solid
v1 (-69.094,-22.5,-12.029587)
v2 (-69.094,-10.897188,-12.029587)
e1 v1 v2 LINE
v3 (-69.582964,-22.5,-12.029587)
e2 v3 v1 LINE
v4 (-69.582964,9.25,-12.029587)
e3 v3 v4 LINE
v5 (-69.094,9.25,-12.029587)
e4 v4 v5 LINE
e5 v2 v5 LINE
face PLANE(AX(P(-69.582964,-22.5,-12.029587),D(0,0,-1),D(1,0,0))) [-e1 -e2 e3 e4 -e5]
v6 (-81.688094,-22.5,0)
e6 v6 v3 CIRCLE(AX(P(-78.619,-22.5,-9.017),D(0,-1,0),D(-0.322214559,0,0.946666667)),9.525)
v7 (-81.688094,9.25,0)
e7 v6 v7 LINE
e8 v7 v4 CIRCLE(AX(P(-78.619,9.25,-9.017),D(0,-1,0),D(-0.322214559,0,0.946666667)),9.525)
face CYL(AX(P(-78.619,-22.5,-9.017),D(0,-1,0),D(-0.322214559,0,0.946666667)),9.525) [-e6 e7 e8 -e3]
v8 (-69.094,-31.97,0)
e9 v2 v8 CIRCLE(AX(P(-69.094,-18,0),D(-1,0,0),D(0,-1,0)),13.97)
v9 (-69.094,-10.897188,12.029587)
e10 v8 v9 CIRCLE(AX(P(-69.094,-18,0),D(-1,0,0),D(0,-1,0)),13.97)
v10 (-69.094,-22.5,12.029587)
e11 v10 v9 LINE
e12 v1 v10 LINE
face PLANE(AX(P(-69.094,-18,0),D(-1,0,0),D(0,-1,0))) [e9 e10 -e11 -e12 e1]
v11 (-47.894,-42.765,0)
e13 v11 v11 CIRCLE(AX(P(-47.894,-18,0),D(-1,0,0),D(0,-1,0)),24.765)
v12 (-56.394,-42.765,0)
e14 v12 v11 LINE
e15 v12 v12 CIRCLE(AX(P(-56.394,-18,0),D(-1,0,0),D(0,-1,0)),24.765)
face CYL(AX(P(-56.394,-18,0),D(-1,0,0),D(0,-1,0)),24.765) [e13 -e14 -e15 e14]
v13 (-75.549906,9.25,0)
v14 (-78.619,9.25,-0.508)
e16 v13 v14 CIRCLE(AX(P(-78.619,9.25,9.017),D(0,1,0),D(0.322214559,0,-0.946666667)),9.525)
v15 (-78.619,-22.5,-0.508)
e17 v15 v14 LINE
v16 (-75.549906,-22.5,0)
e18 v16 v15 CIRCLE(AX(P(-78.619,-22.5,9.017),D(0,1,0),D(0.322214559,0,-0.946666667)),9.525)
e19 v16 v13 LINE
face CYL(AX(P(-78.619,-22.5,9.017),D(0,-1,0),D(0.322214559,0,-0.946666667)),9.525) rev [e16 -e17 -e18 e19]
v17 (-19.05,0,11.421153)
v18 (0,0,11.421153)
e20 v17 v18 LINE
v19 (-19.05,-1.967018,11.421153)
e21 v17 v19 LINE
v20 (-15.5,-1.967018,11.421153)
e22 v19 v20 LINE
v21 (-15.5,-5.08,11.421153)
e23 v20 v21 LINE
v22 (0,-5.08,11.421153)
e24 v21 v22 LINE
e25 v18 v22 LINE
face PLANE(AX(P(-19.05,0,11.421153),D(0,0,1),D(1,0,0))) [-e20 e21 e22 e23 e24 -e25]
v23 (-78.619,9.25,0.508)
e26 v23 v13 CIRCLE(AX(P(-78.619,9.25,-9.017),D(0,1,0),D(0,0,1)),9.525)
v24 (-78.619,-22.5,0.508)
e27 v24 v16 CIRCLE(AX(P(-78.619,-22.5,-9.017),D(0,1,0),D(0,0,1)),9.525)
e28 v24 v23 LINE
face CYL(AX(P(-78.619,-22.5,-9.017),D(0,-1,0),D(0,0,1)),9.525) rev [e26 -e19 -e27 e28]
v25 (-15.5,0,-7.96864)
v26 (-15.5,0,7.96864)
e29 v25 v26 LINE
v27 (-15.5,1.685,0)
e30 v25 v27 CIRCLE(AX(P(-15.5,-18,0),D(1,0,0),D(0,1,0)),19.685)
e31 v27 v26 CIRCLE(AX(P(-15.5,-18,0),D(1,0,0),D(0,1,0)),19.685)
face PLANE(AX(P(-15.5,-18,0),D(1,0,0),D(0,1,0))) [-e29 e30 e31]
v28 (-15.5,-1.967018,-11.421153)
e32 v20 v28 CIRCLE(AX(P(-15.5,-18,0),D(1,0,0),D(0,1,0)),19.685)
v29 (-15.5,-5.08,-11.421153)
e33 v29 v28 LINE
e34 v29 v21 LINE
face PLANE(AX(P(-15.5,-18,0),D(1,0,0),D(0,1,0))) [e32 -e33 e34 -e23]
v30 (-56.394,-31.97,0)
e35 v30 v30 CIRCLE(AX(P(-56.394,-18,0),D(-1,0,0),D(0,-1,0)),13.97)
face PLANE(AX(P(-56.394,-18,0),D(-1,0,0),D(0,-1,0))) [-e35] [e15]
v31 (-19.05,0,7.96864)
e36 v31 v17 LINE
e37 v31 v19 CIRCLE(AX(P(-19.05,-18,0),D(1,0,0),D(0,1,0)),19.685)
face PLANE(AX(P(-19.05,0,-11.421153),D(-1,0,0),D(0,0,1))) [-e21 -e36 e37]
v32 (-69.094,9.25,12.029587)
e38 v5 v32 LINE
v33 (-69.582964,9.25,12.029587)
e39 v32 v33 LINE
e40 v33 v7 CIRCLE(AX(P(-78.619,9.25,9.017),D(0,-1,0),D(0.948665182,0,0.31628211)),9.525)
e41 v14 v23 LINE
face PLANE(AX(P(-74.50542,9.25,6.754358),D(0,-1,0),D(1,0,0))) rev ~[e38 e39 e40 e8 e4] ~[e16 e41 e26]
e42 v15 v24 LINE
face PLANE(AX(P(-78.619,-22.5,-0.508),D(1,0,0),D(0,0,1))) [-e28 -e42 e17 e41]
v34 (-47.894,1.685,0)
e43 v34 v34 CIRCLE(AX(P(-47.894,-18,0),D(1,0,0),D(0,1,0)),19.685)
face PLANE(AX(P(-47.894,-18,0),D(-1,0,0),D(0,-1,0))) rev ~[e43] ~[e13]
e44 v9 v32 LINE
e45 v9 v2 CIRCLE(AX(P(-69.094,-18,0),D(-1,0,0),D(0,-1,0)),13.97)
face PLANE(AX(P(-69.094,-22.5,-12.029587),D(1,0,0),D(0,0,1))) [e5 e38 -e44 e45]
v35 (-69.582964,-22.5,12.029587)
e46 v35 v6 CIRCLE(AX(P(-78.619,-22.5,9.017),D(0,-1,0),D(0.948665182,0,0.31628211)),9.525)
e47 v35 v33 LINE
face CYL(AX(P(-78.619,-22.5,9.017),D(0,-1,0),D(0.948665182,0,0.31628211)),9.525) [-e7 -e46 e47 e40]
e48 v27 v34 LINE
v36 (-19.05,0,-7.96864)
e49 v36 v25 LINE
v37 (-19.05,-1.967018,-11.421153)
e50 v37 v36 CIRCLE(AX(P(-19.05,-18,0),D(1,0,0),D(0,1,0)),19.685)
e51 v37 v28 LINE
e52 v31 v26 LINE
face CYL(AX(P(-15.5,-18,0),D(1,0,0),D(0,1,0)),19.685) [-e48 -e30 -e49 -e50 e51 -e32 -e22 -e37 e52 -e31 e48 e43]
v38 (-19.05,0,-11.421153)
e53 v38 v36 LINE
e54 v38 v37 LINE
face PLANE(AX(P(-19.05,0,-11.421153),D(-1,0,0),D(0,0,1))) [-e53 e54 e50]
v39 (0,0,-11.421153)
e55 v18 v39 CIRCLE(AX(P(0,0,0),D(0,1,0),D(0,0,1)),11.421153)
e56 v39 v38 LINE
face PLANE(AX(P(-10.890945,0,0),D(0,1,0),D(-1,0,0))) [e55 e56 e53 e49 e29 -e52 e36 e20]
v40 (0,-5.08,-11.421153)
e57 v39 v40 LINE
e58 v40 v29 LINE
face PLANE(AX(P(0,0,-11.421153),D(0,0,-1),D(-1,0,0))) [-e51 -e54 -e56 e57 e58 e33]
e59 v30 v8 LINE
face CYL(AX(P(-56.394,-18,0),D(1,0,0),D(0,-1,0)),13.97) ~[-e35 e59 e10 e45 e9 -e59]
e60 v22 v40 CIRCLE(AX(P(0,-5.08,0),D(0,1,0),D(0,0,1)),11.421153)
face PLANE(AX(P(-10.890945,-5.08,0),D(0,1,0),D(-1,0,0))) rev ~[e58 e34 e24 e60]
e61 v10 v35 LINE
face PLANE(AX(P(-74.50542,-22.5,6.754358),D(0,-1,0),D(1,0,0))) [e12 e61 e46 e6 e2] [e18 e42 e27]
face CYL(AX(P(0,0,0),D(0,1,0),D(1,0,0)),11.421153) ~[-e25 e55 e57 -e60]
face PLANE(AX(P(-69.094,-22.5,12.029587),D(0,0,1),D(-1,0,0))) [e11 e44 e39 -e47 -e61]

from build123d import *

# Parameters (mm, degrees)
F0_R      = 11.4211526137
F1_DEPTH  = 5.08
F3_R      = 19.685
F4_DEPTH  = 40.894
F6_DEPTH  = 5.08
F9_R      = 24.765
F10_DEPTH = 8.5
F11_R     = 13.97
F12_DEPTH = 12.7
F15_DEPTH = 31.75


with BuildPart() as f1:
    # F0 (on Front) → F1 (new body)
    with BuildSketch(Plane.XZ):
        Circle(F0_R)
    extrude(amount=F1_DEPTH)



with BuildPart() as f4:
    # F3 (on offset) → F4 (new body)
    with BuildSketch(Plane.YZ.offset(-15.5)):
        with Locations((-18, 0)):
            Circle(F3_R)
    extrude(amount=-F4_DEPTH)


with BuildPart() as f1_1:
    add(f1.part)

    add(f4.part)  # F6 merges F4
    # F5 (on face) → F6 (join, through all)
    with BuildSketch(Plane(origin=(0, 0, 0), x_dir=(-1, 0, 0), z_dir=(0, 1, 0))):
        with BuildLine():
            Line((19.05, 11.4211526137), (0, 11.4211526137))
            ThreePointArc((0, 11.4211526137), (8.0759744621, 8.0759744621), (11.4211526137, 0))
            ThreePointArc((11.4211526137, 0), (8.0759744621, -8.0759744621), (0, -11.4211526137))
            Line((0, -11.4211526137), (19.05, -11.4211526137))
            Line((19.05, -11.4211526137), (19.05, 11.4211526137))
        make_face()
    extrude(amount=-F6_DEPTH)

    # F9 (on face) → F10 (join)
    with BuildSketch(Plane(origin=(-56.394, 0, 0), x_dir=(0, -1, 0), z_dir=(-1, 0, 0))):
        with Locations((18, 0)):
            Circle(F9_R)
    extrude(amount=-F10_DEPTH)

    # F11 (on face) → F12 (join)
    with BuildSketch(Plane(origin=(-56.394, 0, 0), x_dir=(0, -1, 0), z_dir=(-1, 0, 0))):
        with Locations((18, 0)):
            Circle(F11_R)
    extrude(amount=F12_DEPTH)

    # F14 (on offset) → F15 (join)
    with BuildSketch(Plane.XZ.offset(22.5)):
        with BuildLine():
            ThreePointArc((-75.5499063227, 0), (-70.8743650094, 3.472069535), (-69.094, 9.017))
            ThreePointArc((-69.094, 9.017), (-69.2170356699, 10.5430051561), (-69.5829641441, 12.0295870961))
            Line((-69.5829641441, 12.0295870961), (-78.619, 12.0295870961))
            Line((-78.619, 12.0295870961), (-78.619, 0.508))
            ThreePointArc((-78.619, 0.508), (-77.0635740133, 0.3801418527), (-75.5499063227, 0))
        make_face()
        with BuildLine():
            Line((-69.094, -9.017), (-69.094, 9.017))
            ThreePointArc((-69.094, 9.017), (-70.8743650094, 3.472069535), (-75.5499063227, 0))
            ThreePointArc((-75.5499063227, 0), (-70.8743650094, -3.472069535), (-69.094, -9.017))
        make_face()
        with BuildLine():
            ThreePointArc((-69.5829641441, 12.0295870961), (-69.2170356699, 10.5430051561), (-69.094, 9.017))
            Line((-69.094, 9.017), (-69.094, 12.0295870961))
            Line((-69.094, 12.0295870961), (-69.5829641441, 12.0295870961))
        make_face()
        with BuildLine():
            Line((-78.619, 12.0295870961), (-69.5829641441, 12.0295870961))
            ThreePointArc((-69.5829641441, 12.0295870961), (-85.3330778344, 15.7732403624), (-81.6880936773, 0))
            ThreePointArc((-81.6880936773, 0), (-80.1744259867, 0.3801418527), (-78.619, 0.508))
            Line((-78.619, 0.508), (-78.619, 12.0295870961))
        make_face()
        with BuildLine():
            ThreePointArc((-69.094, -9.017), (-70.8743650094, -3.472069535), (-75.5499063227, 0))
            ThreePointArc((-75.5499063227, 0), (-77.0635740133, -0.3801418527), (-78.619, -0.508))
            Line((-78.619, -0.508), (-78.619, -12.0295870961))
            Line((-78.619, -12.0295870961), (-69.5829641441, -12.0295870961))
            ThreePointArc((-69.5829641441, -12.0295870961), (-69.2170356699, -10.5430051561), (-69.094, -9.017))
        make_face()
        with BuildLine():
            Line((-69.094, -12.0295870961), (-69.094, -9.017))
            ThreePointArc((-69.094, -9.017), (-69.2170356699, -10.5430051561), (-69.5829641441, -12.0295870961))
            Line((-69.5829641441, -12.0295870961), (-69.094, -12.0295870961))
        make_face()
        with BuildLine():
            ThreePointArc((-78.619, 0.508), (-80.1744259867, 0.3801418527), (-81.6880936773, 0))
            ThreePointArc((-81.6880936773, 0), (-80.1744259867, -0.3801418527), (-78.619, -0.508))
            Line((-78.619, -0.508), (-78.619, 0.508))
        make_face()
        with BuildLine():
            ThreePointArc((-78.619, -0.508), (-80.1744259867, -0.3801418527), (-81.6880936773, 0))
            ThreePointArc((-81.6880936773, 0), (-85.3330778344, -15.7732403624), (-69.5829641441, -12.0295870961))
            Line((-69.5829641441, -12.0295870961), (-78.619, -12.0295870961))
            Line((-78.619, -12.0295870961), (-78.619, -0.508))
        make_face()
    extrude(amount=-F15_DEPTH)


solid = f1_1.part
